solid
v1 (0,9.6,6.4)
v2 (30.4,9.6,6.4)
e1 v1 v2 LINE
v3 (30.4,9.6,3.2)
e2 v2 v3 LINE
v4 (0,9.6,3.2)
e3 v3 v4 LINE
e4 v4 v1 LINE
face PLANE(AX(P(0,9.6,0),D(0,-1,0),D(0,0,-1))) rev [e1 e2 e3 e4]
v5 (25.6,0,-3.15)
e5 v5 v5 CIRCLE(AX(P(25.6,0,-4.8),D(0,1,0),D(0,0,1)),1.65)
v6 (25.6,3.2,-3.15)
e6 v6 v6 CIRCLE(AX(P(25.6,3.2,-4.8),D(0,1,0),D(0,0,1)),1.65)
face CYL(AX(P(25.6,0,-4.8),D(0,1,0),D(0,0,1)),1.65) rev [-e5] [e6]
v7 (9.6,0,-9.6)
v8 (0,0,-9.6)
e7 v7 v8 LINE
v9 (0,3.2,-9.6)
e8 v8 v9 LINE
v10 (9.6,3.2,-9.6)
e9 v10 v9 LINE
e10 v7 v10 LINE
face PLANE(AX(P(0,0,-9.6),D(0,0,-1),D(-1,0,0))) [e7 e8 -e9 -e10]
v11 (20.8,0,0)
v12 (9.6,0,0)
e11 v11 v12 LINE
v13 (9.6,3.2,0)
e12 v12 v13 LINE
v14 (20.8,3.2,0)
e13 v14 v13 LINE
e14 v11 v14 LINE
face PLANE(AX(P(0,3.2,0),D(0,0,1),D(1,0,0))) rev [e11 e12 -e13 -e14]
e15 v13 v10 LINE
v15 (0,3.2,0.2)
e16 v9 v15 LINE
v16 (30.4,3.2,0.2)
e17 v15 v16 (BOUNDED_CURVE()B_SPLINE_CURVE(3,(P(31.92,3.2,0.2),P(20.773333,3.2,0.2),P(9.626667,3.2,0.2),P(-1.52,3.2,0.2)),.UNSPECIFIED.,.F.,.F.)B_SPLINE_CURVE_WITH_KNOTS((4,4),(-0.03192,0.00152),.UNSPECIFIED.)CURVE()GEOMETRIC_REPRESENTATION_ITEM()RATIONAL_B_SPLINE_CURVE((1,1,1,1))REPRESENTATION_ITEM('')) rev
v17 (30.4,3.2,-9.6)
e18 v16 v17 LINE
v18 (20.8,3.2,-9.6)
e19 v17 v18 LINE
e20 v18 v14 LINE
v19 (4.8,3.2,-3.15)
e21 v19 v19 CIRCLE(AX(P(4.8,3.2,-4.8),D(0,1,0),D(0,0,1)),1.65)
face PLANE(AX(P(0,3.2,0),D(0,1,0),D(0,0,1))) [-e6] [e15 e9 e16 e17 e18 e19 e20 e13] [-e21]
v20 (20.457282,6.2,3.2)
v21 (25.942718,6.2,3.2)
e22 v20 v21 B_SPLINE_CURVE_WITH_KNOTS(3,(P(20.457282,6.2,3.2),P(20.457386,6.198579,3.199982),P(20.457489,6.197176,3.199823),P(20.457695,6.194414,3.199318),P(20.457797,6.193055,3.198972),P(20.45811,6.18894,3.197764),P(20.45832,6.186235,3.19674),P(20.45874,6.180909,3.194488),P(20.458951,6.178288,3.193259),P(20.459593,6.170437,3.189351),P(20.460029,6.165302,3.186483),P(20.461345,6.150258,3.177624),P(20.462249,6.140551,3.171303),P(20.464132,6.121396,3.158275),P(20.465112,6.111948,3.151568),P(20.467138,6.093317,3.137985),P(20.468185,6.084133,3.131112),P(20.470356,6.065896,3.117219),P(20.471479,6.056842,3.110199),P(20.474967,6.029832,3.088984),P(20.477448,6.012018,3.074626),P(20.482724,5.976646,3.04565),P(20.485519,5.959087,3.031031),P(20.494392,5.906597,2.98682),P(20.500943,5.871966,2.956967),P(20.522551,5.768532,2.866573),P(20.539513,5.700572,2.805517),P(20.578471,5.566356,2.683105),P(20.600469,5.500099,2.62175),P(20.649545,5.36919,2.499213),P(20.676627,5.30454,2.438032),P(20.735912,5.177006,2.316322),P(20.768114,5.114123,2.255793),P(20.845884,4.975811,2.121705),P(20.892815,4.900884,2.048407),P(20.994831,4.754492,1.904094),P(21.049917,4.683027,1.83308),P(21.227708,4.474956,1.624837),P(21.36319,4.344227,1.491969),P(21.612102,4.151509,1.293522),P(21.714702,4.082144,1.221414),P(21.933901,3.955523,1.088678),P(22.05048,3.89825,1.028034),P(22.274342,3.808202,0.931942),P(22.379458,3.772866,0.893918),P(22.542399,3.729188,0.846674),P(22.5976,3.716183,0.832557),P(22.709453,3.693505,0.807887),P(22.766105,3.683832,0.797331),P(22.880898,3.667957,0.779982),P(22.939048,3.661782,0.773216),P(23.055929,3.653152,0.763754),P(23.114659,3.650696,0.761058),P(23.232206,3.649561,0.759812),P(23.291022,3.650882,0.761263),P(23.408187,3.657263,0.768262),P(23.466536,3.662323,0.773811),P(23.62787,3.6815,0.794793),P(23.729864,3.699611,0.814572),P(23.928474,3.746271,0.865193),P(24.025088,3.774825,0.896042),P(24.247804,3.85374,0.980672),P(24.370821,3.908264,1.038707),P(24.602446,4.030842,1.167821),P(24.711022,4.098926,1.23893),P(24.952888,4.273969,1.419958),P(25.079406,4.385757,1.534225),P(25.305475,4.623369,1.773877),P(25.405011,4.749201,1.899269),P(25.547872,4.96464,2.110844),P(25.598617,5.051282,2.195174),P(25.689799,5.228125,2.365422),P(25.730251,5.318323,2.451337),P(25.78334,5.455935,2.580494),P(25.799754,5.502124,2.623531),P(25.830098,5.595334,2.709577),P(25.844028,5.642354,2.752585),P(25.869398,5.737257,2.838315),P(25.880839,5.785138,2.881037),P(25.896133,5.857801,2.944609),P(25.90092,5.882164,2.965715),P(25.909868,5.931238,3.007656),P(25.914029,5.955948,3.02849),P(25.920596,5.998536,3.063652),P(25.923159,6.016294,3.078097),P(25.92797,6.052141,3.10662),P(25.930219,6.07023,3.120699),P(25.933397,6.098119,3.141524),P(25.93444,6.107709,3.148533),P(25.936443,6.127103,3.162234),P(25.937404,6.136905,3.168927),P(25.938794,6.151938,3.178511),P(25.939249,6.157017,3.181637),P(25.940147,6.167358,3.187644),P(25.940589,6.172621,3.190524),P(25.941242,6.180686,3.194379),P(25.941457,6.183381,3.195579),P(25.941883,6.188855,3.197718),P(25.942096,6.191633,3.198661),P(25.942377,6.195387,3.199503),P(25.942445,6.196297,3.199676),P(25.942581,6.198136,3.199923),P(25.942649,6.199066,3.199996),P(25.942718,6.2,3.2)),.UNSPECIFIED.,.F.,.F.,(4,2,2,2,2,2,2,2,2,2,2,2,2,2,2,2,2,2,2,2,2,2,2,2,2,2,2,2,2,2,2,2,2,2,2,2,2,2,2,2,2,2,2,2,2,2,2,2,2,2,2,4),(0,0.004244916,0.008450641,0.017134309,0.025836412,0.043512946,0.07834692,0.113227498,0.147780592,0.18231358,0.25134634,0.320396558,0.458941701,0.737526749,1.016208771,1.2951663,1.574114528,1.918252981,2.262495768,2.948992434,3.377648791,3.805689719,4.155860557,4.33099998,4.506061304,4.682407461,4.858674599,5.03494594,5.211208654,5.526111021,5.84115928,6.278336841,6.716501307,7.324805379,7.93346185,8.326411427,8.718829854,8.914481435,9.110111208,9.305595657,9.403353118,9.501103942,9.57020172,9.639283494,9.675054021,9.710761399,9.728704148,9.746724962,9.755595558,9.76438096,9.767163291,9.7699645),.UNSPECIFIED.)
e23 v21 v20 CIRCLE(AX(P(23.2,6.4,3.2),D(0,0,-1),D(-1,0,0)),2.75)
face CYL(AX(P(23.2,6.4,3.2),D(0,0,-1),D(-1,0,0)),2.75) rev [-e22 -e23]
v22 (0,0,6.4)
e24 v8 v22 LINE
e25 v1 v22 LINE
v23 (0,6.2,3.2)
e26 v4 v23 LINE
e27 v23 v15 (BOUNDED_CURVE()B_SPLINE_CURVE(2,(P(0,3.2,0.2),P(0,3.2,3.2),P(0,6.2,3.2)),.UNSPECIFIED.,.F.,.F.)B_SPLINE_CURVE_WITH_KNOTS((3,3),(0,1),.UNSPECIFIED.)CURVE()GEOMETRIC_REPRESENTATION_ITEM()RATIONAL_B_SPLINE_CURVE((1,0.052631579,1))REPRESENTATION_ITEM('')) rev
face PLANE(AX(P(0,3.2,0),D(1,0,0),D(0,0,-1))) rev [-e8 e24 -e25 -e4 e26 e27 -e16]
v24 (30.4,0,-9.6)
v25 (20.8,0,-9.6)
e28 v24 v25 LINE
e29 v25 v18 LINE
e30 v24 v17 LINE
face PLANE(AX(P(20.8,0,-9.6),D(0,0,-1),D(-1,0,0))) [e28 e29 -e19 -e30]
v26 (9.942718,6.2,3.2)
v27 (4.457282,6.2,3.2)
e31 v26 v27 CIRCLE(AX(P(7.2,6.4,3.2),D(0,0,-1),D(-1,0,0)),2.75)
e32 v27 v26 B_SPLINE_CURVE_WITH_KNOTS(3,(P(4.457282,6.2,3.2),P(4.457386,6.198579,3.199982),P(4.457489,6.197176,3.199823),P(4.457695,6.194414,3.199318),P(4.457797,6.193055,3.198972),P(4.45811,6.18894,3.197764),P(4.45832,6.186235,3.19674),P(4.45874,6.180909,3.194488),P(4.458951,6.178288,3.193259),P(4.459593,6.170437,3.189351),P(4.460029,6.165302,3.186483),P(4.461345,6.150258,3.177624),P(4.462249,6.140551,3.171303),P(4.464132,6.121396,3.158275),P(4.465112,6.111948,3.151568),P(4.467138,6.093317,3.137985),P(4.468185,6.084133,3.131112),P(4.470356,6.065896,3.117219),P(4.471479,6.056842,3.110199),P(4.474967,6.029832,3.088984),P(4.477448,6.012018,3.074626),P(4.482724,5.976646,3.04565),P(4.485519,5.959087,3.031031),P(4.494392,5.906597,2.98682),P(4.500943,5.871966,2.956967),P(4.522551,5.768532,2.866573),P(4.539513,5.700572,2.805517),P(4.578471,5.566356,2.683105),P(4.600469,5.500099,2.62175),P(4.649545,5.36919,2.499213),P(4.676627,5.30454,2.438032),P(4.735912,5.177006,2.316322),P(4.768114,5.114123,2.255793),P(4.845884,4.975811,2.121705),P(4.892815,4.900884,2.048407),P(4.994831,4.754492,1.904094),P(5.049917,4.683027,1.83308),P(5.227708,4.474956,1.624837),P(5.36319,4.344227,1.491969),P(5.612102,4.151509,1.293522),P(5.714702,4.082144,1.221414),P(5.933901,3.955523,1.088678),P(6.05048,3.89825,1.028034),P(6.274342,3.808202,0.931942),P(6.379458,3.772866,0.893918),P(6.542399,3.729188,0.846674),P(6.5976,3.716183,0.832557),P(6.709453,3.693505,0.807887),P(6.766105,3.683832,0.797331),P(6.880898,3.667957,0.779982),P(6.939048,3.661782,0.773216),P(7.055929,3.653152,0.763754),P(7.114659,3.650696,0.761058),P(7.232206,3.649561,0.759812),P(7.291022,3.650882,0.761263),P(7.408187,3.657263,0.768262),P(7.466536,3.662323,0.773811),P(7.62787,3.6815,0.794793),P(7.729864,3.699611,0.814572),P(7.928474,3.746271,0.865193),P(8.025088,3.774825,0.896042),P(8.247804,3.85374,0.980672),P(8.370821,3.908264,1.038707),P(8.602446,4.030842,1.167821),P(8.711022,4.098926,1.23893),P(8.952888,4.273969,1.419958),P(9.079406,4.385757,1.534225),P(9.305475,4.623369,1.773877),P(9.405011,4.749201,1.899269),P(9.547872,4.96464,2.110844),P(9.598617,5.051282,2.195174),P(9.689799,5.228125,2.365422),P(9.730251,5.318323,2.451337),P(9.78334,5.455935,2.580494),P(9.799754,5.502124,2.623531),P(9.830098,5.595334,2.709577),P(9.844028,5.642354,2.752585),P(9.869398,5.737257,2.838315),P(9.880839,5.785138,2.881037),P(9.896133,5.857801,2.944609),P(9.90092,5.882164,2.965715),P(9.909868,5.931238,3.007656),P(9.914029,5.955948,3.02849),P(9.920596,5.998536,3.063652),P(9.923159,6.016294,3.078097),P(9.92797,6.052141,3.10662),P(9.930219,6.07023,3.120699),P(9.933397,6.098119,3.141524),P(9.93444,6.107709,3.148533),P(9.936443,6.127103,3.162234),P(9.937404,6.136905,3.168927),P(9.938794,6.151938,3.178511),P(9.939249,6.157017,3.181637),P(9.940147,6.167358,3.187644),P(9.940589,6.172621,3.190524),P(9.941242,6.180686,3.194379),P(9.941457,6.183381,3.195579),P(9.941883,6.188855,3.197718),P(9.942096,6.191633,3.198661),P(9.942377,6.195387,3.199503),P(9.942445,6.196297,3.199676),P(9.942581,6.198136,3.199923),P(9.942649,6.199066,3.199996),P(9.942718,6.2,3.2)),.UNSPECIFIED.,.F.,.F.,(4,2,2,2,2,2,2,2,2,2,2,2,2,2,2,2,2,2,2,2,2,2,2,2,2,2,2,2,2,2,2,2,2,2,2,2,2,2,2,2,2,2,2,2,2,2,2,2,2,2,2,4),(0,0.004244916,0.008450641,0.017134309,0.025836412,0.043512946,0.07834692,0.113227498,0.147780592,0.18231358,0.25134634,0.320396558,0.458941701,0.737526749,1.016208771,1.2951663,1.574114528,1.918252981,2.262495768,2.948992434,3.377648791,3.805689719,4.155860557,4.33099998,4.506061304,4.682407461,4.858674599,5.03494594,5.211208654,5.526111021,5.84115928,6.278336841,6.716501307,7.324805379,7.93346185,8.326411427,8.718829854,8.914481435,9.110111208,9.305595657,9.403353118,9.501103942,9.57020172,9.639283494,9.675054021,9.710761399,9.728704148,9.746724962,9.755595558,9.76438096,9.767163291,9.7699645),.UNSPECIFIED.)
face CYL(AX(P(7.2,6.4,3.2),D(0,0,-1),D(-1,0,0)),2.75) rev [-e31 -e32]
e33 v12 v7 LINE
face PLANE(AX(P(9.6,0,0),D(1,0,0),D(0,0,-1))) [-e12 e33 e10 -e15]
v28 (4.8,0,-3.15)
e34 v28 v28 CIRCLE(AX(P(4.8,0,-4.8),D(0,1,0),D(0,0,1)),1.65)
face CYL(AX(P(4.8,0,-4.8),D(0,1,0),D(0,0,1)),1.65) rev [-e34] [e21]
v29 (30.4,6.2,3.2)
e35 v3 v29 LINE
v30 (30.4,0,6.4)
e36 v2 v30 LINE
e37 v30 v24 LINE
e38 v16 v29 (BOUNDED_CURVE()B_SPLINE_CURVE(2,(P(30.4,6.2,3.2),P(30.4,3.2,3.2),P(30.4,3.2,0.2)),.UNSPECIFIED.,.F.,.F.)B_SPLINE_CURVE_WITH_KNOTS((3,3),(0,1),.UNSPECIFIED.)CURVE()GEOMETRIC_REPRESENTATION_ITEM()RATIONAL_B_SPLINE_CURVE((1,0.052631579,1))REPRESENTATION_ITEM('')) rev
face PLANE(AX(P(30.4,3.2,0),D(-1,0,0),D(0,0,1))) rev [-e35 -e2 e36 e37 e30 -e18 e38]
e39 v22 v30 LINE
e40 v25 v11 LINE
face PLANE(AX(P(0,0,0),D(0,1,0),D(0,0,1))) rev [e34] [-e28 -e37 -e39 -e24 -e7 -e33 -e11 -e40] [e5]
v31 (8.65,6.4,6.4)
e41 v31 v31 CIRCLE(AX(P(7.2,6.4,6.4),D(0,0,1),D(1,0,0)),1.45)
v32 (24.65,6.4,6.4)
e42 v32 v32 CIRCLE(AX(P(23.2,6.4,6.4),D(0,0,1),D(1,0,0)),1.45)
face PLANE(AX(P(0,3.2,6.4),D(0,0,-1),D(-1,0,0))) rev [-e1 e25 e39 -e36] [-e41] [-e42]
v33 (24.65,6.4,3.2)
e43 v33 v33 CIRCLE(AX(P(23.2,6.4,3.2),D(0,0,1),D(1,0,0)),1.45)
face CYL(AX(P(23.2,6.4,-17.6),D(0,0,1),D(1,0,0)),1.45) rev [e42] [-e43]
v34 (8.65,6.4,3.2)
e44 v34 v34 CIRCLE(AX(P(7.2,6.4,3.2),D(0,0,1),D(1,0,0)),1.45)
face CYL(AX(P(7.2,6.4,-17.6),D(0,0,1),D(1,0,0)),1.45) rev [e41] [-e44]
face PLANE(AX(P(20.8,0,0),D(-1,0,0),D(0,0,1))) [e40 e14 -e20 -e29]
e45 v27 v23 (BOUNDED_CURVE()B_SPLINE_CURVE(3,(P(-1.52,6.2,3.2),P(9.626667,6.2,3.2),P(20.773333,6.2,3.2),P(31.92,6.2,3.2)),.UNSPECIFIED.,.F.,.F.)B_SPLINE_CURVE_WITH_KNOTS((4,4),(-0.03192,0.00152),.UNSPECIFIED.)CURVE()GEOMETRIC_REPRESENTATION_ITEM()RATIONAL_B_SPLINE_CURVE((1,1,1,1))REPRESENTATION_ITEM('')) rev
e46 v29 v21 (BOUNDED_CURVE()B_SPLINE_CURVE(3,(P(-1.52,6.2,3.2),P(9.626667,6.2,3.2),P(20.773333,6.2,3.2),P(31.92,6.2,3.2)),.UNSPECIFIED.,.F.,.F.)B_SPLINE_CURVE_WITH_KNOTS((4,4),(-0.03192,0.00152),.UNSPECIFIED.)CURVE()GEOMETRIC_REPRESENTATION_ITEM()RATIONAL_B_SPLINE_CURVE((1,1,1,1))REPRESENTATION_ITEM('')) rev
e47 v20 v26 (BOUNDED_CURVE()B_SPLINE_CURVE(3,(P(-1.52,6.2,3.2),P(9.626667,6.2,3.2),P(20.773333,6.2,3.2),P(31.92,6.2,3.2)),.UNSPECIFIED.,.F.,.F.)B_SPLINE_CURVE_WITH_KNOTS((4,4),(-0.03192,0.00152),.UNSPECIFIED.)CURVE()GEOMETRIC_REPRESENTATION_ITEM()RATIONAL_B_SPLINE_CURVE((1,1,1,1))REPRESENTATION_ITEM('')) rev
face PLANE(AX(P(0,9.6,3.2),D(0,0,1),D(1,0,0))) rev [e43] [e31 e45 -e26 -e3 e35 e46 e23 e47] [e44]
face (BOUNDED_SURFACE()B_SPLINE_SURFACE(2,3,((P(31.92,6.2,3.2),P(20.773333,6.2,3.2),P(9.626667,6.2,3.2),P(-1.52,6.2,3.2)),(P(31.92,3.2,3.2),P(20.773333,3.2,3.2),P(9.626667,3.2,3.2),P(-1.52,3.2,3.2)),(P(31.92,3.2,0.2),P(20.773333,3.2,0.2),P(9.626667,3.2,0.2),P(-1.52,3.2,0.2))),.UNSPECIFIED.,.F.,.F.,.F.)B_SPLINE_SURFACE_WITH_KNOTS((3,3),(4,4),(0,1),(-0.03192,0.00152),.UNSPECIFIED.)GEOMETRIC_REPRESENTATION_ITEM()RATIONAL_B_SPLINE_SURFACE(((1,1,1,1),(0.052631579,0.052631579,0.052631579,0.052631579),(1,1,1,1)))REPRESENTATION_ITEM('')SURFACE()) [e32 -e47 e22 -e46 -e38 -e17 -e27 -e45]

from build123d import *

# Parameters (mm, degrees)
SKETCH1_W           = 30.4
SKETCH1_H           = 6.4
BOSS_EXTRUDE1_DEPTH = 3.2
SKETCH2_W           = 9.6
SKETCH2_H           = 9.6
SKETCH2_R           = 1.65
BOSS_EXTRUDE2_DEPTH = 3.2
SKETCH3_W           = 30.4
SKETCH3_H           = 3.2
BOSS_EXTRUDE3_DEPTH = 6.4
FILLET2_SIZE        = 3
SKETCH4_R           = 1.45
CUT_EXTRUDE1_DEPTH  = 24
SKETCH5_R           = 2.75
CUT_EXTRUDE2_DEPTH  = 4


with BuildPart() as part:
    # Sketch1 → Boss-Extrude1 (new body)
    with BuildSketch(Plane(origin=(0, 0, 0), x_dir=(1, 0, 0), z_dir=(0, 1, 0))):
        with Locations((15.2, -3.2)):
            Rectangle(SKETCH1_W, SKETCH1_H)
    extrude(amount=BOSS_EXTRUDE1_DEPTH)

    # Sketch2 → Boss-Extrude2 (add)
    # profile 1 of 2: a face of its own
    with BuildSketch(Plane(origin=(0, 3.2, 0), x_dir=(1, 0, 0), z_dir=(0, 1, 0))):
        with Locations((4.8, 4.8)):
            Rectangle(SKETCH2_W, SKETCH2_H)
        with Locations(Location((4.8, 4.8, 0), (0, 0, 270))):
            Circle(SKETCH2_R, mode=Mode.SUBTRACT)
    # profile 2 of 2: a face of its own
    with BuildSketch(Plane(origin=(0, 3.2, 0), x_dir=(1, 0, 0), z_dir=(0, 1, 0))):
        with Locations((25.6, 4.8)):
            Rectangle(SKETCH2_W, SKETCH2_H)
        with Locations(Location((25.6, 4.8, 0), (0, 0, 270))):
            Circle(SKETCH2_R, mode=Mode.SUBTRACT)
    extrude(amount=-BOSS_EXTRUDE2_DEPTH)

    # Sketch3 → Boss-Extrude3 (add)
    with BuildSketch(Plane(origin=(0, 3.2, 0), x_dir=(1, 0, 0), z_dir=(0, 1, 0))):
        with Locations((15.2, -4.8)):
            Rectangle(SKETCH3_W, SKETCH3_H)
    extrude(amount=BOSS_EXTRUDE3_DEPTH)

    # Fillet2
    # a fillet whose section is not a circle: 3 mm, written as the material it adds along each edge
    with BuildSketch(Plane(origin=(30.4, 3.2, 3.2), x_dir=(0, 1, 0), z_dir=(-1, 0, 0))) as fillet2_piece_1:
        with BuildLine():
            Bezier((FILLET2_SIZE, 0), (0, 0), (0, FILLET2_SIZE), weights=[1, 0.052631579, 1])
            Line((0, FILLET2_SIZE), (0, 0))
            Line((0, 0), (FILLET2_SIZE, 0))
        make_face()
    extrude(amount=30.4)

    # Sketch4 → Cut-Extrude1 (cut)
    with BuildSketch(Plane.XY.offset(6.4)):
        with Locations((7.2, 6.4)):
            Circle(SKETCH4_R)
        with Locations((23.2, 6.4)):
            Circle(SKETCH4_R)
    extrude(amount=-CUT_EXTRUDE1_DEPTH, mode=Mode.SUBTRACT)

    # Sketch5 → Cut-Extrude2 (cut)
    with BuildSketch(Plane(origin=(0, 0, -0.8), x_dir=(-1, 0, 0), z_dir=(0, 0, -1))):
        with Locations((-23.2, 6.4)):
            Circle(SKETCH5_R)
        with Locations((-7.2, 6.4)):
            Circle(SKETCH5_R)
    extrude(amount=-CUT_EXTRUDE2_DEPTH, mode=Mode.SUBTRACT)


solid = part.part
